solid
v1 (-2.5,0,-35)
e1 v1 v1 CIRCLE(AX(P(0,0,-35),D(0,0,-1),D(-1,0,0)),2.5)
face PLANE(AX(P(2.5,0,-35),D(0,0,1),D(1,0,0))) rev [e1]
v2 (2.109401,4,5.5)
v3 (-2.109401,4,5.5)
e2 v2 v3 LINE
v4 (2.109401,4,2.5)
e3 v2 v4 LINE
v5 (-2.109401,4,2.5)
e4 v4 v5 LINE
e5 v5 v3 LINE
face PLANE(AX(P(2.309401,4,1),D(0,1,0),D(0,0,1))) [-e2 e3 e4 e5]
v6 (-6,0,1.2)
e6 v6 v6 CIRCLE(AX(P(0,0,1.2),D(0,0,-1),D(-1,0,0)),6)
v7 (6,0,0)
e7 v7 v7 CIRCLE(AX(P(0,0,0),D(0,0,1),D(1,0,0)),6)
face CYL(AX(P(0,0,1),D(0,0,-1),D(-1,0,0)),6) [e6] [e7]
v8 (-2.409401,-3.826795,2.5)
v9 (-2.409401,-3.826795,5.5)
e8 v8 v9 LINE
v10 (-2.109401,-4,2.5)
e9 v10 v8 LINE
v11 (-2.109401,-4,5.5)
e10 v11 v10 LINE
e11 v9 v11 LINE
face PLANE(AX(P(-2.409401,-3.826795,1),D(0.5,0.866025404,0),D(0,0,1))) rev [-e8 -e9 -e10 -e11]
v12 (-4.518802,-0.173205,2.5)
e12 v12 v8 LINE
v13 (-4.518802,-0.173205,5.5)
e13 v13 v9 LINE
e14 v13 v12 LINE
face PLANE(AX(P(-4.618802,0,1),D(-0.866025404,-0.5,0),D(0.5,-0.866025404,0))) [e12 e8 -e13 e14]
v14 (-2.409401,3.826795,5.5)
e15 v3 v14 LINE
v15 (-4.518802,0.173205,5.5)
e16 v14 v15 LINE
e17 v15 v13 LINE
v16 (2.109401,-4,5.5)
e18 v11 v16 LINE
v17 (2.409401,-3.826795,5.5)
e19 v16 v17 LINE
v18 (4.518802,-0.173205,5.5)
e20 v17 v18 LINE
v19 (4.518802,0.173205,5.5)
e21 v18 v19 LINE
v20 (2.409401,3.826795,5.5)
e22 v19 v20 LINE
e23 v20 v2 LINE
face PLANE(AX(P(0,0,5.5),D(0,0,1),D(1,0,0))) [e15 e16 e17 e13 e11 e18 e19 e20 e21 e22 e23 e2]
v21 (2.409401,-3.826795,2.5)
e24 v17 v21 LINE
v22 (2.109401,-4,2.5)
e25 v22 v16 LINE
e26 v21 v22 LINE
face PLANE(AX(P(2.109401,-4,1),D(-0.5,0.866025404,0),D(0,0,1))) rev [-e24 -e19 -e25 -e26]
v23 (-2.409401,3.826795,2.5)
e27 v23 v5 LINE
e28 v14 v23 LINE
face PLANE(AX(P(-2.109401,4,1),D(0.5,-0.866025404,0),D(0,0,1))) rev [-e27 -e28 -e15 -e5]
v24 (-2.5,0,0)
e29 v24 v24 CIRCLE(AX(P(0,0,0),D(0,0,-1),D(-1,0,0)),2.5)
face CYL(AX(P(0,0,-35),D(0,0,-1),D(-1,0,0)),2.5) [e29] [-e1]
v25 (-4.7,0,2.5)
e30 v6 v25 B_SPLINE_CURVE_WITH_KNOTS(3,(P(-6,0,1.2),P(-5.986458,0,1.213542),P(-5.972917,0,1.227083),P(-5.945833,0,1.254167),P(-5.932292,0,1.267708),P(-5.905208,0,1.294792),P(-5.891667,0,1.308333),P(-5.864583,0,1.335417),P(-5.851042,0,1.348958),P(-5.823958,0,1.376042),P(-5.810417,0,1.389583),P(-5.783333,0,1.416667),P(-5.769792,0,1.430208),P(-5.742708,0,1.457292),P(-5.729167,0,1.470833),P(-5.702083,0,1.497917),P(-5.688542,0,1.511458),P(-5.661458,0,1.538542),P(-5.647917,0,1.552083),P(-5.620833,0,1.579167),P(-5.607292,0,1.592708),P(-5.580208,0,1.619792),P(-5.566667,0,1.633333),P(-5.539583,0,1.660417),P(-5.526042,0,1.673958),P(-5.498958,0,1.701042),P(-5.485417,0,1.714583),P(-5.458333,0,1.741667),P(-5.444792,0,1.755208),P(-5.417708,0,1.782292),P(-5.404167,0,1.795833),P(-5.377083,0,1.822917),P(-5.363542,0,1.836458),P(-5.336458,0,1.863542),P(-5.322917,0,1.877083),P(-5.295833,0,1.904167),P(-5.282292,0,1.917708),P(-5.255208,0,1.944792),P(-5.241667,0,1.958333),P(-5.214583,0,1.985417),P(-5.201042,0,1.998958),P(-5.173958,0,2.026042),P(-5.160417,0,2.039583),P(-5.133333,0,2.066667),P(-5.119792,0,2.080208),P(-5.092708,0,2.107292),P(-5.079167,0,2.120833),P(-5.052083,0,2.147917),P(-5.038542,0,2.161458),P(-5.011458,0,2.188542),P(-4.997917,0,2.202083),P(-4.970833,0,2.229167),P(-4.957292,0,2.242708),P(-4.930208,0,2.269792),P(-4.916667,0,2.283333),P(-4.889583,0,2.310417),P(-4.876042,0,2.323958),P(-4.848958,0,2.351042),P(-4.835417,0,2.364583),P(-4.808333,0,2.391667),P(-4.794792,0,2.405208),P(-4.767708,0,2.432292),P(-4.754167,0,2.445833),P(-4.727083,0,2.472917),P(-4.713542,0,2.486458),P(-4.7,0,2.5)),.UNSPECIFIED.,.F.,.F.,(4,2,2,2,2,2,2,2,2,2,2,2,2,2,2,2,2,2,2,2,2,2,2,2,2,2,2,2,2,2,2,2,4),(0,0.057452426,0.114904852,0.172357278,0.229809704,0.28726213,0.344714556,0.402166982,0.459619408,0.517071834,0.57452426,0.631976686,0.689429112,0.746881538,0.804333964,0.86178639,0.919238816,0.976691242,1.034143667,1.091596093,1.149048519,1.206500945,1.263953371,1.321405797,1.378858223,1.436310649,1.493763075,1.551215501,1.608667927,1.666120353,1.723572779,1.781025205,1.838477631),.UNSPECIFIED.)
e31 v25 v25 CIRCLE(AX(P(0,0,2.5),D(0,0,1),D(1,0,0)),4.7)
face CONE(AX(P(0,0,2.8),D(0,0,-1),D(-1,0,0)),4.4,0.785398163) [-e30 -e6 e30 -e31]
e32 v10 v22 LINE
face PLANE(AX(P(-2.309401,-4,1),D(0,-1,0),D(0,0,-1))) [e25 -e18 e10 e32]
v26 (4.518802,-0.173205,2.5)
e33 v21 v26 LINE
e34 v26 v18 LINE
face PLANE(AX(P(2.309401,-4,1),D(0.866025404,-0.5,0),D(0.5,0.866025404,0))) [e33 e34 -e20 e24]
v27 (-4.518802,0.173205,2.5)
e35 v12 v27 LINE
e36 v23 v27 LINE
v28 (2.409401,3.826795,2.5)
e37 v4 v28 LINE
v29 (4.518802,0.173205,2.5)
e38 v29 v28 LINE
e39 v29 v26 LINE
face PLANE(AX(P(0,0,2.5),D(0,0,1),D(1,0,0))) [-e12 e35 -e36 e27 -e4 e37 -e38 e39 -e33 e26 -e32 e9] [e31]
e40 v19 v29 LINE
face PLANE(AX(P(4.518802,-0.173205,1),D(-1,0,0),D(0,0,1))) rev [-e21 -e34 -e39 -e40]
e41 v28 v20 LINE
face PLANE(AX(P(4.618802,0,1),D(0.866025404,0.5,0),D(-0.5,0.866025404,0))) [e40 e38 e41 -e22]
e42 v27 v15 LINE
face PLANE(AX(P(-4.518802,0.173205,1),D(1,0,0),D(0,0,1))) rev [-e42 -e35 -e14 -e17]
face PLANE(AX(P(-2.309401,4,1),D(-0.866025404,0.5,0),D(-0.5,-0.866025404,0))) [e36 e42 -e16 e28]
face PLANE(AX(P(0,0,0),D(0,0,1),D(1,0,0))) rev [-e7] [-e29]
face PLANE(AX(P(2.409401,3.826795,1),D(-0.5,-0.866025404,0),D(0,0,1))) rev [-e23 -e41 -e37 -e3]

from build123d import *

# Parameters (mm, degrees)
SKETCH1_W                = 2.5
SKETCH1_H                = 35
SKETCH2_R                = 6
BOSS_EXTRUDE1_DEPTH      = 1
SKETCH3_R                = 4.4
BOSS_EXTRUDE2_DEPTH      = 1.5
CHAMFER1_SIZE            = 1.8
BOSS_EXTRUDE3_DEPTH      = 3
BOSS_EXTRUDE3_DEPTH_BACK = 1.5
CHAMFER2_SIZE            = 0.2
CHAMFER2_EDGE_2_SIZE     = 0.2
CHAMFER2_EDGE_3_SIZE     = 0.2
CHAMFER2_EDGE_4_SIZE     = 0.2
CHAMFER2_EDGE_5_SIZE     = 0.2
CHAMFER2_EDGE_6_SIZE     = 0.2


with BuildPart() as part:
    # Sketch1 → Revolve1 (revolve)
    with BuildSketch(Plane(origin=(0, 0, 0), x_dir=(1, 0, 0), z_dir=(0, 1, 0)), mode=Mode.PRIVATE) as revolve1_sk:
        with Locations((1.25, 17.5)):
            Rectangle(SKETCH1_W, SKETCH1_H)
    revolve(revolve1_sk.sketch.rotate(Axis((0, 0, -35), (0, 0, 1)), 180), axis=Axis((0, 0, -35), (0, 0, 1)))

    # Sketch2 → Boss-Extrude1 (add)
    with BuildSketch(Plane.XY):
        Circle(SKETCH2_R)
    extrude(amount=BOSS_EXTRUDE1_DEPTH)

    # Sketch3 → Boss-Extrude2 (add)
    with BuildSketch(Plane.XY.offset(1)):
        Circle(SKETCH3_R)
    extrude(amount=BOSS_EXTRUDE2_DEPTH)

    # Chamfer1
    # the kernel refuses this chamfer: 1.8 mm, written as the material it adds along each edge
    with BuildSketch(Plane(origin=(0, 0, 1), x_dir=(1, 0, 0), z_dir=(0, -1, 0))) as chamfer1_piece_1_section:
        Polygon((4.4 + CHAMFER1_SIZE, 0), (4.4, CHAMFER1_SIZE), (4.4, 0), align=None)
    chamfer1_piece_1 = revolve(axis=Axis((0, 0, 1), (0, 0, 1)), mode=Mode.PRIVATE)
    chamfer1_piece_1 = chamfer1_piece_1 & Plane(origin=(0, 0, 1.82351745), x_dir=(1, 0, 0), z_dir=(0, 0, -1)) * Cylinder(6, 25, mode=Mode.PRIVATE)
    chamfer1_piece_1 = split(chamfer1_piece_1, bisect_by=Plane(origin=(-5.32351745, 0, 2.5), z_dir=(0, 0, -1)), keep=Keep.TOP, mode=Mode.PRIVATE)
    add(chamfer1_piece_1)

    # Sketch4 → Boss-Extrude3 (add, two sides: drawn at the far end of the back side and taken through both)
    with BuildSketch(Plane.XY.offset(2.5).offset(-BOSS_EXTRUDE3_DEPTH_BACK)):
        Polygon((-2.309401077, 4), (-4.618802154, 0), (-2.309401077, -4), (2.309401077, -4), (4.618802154, 0), (2.309401077, 4), align=None)
    extrude(amount=BOSS_EXTRUDE3_DEPTH + BOSS_EXTRUDE3_DEPTH_BACK)

    # Chamfer2
    chamfer2_edges = [part.edges().sort_by_distance(p)[0] for p in [
        (-2.309401077, 4, 4),
    ]]
    chamfer(chamfer2_edges, length=CHAMFER2_SIZE)

    # Chamfer2 edge 2
    chamfer2_edge_2_edges = [part.edges().sort_by_distance(p)[0] for p in [
        (2.309401077, 4, 4),
    ]]
    chamfer(chamfer2_edge_2_edges, length=CHAMFER2_EDGE_2_SIZE)

    # Chamfer2 edge 3
    chamfer2_edge_3_edges = [part.edges().sort_by_distance(p)[0] for p in [
        (4.618802154, 0, 4),
    ]]
    chamfer(chamfer2_edge_3_edges, length=CHAMFER2_EDGE_3_SIZE)

    # Chamfer2 edge 4
    chamfer2_edge_4_edges = [part.edges().sort_by_distance(p)[0] for p in [
        (2.309401077, -4, 4),
    ]]
    chamfer(chamfer2_edge_4_edges, length=CHAMFER2_EDGE_4_SIZE)

    # Chamfer2 edge 5
    chamfer2_edge_5_edges = [part.edges().sort_by_distance(p)[0] for p in [
        (-2.309401077, -4, 4),
    ]]
    chamfer(chamfer2_edge_5_edges, length=CHAMFER2_EDGE_5_SIZE)

    # Chamfer2 edge 6
    chamfer2_edge_6_edges = [part.edges().sort_by_distance(p)[0] for p in [
        (-4.618802154, 0, 4),
    ]]
    chamfer(chamfer2_edge_6_edges, length=CHAMFER2_EDGE_6_SIZE)


solid = part.part
